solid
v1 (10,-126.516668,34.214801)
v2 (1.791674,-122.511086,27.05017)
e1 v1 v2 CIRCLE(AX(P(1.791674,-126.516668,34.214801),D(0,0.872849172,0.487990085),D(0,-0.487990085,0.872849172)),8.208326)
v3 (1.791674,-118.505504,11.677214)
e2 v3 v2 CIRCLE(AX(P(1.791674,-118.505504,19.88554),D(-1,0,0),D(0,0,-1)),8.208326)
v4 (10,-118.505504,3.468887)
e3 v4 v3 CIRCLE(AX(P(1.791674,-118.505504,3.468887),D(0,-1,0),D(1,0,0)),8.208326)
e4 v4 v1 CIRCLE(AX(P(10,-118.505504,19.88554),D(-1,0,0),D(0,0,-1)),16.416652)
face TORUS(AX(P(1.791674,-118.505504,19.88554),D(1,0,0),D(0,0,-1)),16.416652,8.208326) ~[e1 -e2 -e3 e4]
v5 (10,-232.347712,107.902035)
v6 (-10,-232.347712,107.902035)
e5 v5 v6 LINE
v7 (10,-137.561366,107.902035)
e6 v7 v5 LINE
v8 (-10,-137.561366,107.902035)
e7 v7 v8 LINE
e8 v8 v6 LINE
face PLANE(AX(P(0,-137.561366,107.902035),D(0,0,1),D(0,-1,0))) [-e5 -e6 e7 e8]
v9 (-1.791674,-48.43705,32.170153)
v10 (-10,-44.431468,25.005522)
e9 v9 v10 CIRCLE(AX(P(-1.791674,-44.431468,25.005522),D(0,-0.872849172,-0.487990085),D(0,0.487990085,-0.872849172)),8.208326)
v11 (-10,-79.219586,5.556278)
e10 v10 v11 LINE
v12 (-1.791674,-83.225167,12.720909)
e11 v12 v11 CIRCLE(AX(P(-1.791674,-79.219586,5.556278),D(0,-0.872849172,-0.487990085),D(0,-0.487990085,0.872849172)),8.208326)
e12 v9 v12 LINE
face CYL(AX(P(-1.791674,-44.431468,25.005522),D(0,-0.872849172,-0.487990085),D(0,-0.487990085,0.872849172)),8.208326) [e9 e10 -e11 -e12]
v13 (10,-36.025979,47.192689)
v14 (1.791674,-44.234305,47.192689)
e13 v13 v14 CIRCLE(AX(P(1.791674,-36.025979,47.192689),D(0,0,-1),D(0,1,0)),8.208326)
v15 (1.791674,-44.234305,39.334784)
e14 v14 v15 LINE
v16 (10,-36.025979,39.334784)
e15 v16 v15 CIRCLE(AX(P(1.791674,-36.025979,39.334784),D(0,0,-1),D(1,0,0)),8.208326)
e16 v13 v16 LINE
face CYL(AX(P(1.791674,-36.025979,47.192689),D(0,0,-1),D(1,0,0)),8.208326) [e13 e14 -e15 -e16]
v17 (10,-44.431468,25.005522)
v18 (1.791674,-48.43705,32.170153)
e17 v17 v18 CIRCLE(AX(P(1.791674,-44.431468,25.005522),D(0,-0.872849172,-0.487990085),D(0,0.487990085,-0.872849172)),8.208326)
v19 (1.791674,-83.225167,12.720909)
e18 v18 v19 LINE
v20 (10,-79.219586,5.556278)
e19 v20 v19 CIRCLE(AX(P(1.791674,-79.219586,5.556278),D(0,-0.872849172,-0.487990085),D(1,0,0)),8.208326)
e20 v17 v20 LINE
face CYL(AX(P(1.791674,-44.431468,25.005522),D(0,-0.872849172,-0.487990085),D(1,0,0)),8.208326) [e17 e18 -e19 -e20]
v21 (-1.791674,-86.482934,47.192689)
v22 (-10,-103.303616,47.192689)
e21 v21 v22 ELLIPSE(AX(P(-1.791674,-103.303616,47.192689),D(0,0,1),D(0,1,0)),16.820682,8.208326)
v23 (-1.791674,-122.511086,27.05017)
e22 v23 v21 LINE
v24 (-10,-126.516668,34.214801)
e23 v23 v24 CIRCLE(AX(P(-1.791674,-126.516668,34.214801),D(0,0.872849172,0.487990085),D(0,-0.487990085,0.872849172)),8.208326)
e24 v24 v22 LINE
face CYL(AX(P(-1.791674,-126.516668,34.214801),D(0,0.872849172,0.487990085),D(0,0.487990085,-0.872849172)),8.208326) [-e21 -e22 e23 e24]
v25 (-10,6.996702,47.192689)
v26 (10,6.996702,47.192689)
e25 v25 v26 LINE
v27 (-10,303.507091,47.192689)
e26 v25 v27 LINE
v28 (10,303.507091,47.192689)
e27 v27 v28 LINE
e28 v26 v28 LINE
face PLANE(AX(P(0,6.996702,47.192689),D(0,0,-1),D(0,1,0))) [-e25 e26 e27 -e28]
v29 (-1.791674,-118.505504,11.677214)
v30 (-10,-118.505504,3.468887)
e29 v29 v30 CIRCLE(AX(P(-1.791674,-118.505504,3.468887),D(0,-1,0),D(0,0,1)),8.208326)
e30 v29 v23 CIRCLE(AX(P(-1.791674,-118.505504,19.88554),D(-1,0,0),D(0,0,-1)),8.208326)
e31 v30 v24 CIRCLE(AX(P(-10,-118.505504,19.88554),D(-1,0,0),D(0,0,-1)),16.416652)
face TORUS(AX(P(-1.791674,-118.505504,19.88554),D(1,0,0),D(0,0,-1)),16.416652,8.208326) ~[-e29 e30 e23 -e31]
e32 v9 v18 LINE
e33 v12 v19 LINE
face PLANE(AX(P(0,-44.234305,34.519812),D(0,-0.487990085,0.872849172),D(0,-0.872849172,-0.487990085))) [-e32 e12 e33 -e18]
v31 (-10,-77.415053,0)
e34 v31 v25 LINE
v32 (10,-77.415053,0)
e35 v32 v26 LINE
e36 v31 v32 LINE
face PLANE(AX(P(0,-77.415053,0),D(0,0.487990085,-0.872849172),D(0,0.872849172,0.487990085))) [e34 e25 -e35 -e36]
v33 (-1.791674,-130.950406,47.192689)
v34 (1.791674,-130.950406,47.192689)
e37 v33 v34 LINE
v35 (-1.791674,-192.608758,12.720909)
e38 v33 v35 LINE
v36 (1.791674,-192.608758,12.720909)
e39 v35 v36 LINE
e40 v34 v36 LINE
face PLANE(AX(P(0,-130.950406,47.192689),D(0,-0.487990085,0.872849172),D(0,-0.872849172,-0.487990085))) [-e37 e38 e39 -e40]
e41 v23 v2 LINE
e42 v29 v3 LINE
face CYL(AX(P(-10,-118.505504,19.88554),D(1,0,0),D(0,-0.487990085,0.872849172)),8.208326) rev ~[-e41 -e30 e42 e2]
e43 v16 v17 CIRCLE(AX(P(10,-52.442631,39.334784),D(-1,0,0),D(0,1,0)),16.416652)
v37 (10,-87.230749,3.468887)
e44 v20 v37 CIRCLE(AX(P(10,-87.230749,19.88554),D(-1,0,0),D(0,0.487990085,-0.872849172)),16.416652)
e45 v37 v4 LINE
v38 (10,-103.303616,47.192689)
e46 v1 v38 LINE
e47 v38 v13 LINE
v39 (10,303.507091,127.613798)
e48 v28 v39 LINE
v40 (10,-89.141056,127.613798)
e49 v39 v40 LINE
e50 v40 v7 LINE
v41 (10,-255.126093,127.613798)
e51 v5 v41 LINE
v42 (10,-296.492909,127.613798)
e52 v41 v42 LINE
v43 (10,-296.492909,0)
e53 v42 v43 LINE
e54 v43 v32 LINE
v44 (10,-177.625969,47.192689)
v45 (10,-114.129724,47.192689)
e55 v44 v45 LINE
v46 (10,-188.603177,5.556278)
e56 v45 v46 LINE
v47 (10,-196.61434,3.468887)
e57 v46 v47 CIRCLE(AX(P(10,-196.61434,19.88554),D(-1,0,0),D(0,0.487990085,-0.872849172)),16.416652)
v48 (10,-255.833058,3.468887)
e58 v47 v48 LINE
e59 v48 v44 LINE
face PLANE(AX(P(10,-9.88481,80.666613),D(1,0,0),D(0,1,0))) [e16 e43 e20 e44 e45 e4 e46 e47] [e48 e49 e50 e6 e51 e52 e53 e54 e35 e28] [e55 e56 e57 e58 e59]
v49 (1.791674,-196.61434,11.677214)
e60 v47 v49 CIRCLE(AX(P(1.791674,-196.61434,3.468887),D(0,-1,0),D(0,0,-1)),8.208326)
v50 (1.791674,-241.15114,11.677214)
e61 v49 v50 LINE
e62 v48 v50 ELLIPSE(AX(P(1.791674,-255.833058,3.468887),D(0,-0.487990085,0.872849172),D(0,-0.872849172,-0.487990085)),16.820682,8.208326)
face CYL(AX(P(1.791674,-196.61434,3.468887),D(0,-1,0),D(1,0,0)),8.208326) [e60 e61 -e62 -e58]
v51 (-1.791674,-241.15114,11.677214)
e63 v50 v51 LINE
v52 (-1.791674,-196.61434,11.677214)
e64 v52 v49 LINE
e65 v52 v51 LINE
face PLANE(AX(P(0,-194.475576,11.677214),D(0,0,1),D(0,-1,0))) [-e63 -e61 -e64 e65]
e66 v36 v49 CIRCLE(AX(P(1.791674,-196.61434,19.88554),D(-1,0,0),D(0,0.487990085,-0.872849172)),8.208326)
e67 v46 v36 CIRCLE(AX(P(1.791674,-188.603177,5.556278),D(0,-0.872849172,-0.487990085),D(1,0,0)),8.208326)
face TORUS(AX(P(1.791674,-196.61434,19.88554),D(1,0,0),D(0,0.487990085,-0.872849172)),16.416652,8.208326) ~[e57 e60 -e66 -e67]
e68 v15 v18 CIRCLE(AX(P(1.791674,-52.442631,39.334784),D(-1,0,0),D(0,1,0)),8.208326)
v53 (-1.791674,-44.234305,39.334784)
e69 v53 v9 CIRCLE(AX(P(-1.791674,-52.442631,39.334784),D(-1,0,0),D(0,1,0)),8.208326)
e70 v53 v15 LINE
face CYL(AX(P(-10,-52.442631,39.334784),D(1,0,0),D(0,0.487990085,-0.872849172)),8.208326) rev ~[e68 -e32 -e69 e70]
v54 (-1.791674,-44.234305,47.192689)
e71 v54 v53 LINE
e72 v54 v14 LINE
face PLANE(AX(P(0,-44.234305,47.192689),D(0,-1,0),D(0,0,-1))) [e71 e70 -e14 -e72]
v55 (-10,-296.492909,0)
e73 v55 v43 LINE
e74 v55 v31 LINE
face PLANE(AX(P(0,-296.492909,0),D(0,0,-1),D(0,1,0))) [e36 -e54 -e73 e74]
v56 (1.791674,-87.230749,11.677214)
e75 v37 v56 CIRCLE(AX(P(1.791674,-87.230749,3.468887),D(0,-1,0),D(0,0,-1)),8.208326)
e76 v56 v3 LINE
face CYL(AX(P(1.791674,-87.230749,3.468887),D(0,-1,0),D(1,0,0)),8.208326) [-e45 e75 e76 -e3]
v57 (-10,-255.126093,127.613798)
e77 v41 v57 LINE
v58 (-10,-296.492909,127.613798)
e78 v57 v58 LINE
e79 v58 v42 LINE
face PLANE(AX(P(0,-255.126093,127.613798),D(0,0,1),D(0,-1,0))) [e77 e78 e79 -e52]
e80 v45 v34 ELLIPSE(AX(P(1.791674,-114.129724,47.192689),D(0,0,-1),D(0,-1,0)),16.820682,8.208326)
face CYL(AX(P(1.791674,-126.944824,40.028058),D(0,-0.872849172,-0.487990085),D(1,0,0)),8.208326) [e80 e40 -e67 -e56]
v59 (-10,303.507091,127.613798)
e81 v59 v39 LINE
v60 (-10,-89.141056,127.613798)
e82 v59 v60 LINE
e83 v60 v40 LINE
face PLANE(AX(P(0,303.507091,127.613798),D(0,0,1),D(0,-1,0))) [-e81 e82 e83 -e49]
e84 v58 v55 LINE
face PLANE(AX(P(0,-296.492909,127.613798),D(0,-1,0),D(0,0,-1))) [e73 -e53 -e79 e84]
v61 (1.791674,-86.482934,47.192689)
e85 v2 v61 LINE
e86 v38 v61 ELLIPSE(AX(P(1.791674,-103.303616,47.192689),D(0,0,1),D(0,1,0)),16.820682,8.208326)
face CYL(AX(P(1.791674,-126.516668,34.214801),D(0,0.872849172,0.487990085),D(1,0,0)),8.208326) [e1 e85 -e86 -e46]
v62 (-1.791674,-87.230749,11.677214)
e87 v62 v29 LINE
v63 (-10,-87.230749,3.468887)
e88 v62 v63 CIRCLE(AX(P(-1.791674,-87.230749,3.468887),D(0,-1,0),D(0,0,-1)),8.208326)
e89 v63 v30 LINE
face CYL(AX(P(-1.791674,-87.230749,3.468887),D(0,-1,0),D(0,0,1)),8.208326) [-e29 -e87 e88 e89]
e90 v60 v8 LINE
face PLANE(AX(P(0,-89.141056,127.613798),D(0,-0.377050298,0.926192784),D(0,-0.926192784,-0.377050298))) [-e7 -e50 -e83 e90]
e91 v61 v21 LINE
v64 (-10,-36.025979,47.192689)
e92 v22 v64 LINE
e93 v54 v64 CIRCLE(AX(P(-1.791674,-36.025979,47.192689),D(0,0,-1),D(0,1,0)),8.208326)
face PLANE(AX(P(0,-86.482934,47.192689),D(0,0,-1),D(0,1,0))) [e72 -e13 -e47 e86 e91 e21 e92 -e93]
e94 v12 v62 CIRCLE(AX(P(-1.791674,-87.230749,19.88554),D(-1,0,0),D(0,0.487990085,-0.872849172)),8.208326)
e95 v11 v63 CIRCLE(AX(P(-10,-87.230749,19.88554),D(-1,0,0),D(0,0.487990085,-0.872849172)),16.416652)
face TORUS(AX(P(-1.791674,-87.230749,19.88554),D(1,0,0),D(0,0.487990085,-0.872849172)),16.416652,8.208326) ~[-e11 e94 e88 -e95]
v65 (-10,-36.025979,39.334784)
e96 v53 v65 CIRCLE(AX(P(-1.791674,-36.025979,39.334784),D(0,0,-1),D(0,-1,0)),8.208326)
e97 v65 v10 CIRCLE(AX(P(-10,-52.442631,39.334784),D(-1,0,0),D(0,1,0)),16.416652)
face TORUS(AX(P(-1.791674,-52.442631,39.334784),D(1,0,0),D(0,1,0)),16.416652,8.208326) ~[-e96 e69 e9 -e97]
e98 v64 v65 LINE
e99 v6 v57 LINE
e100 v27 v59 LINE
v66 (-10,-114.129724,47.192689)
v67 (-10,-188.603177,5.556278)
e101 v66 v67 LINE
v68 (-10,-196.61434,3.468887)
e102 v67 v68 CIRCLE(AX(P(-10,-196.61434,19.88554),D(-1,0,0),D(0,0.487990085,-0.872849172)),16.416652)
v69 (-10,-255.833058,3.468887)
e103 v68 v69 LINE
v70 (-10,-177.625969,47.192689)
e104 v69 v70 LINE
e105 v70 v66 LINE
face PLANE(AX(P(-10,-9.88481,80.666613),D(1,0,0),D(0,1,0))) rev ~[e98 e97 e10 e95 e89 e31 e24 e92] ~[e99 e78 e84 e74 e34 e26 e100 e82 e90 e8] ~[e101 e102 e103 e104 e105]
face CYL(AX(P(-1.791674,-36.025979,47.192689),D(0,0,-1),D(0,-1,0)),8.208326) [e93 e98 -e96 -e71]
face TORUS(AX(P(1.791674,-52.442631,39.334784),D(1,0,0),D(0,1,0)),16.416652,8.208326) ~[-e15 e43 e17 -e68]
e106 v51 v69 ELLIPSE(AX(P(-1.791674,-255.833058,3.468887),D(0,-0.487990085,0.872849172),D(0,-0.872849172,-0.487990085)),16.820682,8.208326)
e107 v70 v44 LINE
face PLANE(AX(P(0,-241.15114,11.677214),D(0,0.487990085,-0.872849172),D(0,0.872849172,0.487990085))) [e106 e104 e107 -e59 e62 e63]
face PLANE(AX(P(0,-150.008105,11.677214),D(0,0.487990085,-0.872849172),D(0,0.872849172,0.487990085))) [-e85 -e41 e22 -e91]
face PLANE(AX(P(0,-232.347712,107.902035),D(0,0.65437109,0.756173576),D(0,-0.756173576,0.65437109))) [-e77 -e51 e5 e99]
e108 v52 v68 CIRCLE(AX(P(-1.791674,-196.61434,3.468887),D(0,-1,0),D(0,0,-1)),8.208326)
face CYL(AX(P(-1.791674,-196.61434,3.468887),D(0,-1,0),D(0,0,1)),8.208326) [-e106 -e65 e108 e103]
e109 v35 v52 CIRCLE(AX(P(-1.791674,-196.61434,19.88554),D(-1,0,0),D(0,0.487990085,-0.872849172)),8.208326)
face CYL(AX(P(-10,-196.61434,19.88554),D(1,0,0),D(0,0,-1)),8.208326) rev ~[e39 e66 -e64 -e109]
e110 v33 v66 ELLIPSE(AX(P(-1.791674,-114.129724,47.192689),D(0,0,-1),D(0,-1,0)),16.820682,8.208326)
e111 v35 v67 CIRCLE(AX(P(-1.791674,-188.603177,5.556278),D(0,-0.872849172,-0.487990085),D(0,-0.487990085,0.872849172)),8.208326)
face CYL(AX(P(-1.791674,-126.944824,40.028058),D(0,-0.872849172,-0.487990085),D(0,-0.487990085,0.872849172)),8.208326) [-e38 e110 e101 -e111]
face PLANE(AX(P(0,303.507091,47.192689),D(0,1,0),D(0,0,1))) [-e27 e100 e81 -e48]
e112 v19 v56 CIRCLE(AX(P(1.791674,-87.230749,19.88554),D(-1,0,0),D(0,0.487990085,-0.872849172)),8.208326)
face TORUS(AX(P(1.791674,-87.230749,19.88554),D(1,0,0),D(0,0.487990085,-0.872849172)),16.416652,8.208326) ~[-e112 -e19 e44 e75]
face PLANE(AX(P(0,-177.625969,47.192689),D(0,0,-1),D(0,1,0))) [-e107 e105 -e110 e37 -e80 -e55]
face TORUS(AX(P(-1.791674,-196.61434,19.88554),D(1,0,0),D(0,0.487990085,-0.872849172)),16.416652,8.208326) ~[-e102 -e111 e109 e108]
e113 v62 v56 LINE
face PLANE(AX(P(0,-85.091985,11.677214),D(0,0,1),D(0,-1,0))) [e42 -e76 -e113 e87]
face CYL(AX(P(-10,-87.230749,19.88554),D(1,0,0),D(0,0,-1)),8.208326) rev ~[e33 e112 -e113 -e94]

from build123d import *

# Parameters (mm, degrees)
F1_DEPTH = 10
F2_F1_R  = 8.2083261121
F2_F2_R  = 8.2083261121


with BuildPart() as f1:
    # F0 (on Right) → F1 (new body, symmetric)
    with BuildSketch(Plane.YZ):
        Polygon((-255.1260930291, 127.6137977839), (-296.4929085316, 127.6137977839), (-296.4929085316, 0), (-262.0377242565, 0), (-241.1511396352, 11.6772135656), (-177.6259690523, 47.1926890314), (-130.9504058889, 47.1926890314), (-86.4829342095, 47.1926890314), (-44.2343052483, 47.1926890314), (6.9967018189, 47.1926890314), (303.5070914684, 47.1926890314), (303.5070914684, 127.6137977839), (-89.1410559416, 127.6137977839), (-137.561365962, 107.9020351171), (-232.3477119207, 107.9020351171), align=None)
        Polygon((-241.1511396352, 11.6772135656), (-262.0377242565, 0), (-77.4150533853, 0), (6.9967018189, 47.1926890314), (-44.2343052483, 47.1926890314), (-44.2343052483, 34.5198116153), (-85.0919854182, 11.6772135656), (-150.0081047923, 11.6772135656), (-194.4755764717, 11.6772135656), align=None)
        Polygon((-130.9504058889, 47.1926890314), (-194.4755764717, 11.6772135656), (-150.0081047923, 11.6772135656), (-86.4829342095, 47.1926890314), align=None)
    extrude(amount=F1_DEPTH, both=True)

    # F2: fillet of radius 8.2083261121 on 12 edges, made by hand

    # F2_f1
    f2_f1_edges = [f1.edges().sort_by_distance(p)[0] for p in [
        (0, -150.0081047923, 11.6772135656),
        (0, -194.4755764717, 11.6772135656),
        (0, -85.0919854182, 11.6772135656),
        (0, -44.2343052483, 34.5198116153),
    ]]
    fillet(f2_f1_edges, radius=F2_F1_R)

    # F2_f2
    f2_f2_edges = [f1.edges().sort_by_distance(p)[0] for p in [
        (10, -161.7795821345, 29.9567990284),
        (-10, -161.7795821345, 29.9567990284),
        (-10, -104.4970100413, 37.1214296806),
        (10, -104.4970100413, 37.1214296806),
        (10, -126.4486219722, 17.8158787517),
        (-10, -126.4486219722, 17.8158787517),
        (-10, -194.5446792073, 11.9424218254),
        (10, -194.5446792073, 11.9424218254),
    ]]
    fillet(f2_f2_edges, radius=F2_F2_R)


solid = f1.part
